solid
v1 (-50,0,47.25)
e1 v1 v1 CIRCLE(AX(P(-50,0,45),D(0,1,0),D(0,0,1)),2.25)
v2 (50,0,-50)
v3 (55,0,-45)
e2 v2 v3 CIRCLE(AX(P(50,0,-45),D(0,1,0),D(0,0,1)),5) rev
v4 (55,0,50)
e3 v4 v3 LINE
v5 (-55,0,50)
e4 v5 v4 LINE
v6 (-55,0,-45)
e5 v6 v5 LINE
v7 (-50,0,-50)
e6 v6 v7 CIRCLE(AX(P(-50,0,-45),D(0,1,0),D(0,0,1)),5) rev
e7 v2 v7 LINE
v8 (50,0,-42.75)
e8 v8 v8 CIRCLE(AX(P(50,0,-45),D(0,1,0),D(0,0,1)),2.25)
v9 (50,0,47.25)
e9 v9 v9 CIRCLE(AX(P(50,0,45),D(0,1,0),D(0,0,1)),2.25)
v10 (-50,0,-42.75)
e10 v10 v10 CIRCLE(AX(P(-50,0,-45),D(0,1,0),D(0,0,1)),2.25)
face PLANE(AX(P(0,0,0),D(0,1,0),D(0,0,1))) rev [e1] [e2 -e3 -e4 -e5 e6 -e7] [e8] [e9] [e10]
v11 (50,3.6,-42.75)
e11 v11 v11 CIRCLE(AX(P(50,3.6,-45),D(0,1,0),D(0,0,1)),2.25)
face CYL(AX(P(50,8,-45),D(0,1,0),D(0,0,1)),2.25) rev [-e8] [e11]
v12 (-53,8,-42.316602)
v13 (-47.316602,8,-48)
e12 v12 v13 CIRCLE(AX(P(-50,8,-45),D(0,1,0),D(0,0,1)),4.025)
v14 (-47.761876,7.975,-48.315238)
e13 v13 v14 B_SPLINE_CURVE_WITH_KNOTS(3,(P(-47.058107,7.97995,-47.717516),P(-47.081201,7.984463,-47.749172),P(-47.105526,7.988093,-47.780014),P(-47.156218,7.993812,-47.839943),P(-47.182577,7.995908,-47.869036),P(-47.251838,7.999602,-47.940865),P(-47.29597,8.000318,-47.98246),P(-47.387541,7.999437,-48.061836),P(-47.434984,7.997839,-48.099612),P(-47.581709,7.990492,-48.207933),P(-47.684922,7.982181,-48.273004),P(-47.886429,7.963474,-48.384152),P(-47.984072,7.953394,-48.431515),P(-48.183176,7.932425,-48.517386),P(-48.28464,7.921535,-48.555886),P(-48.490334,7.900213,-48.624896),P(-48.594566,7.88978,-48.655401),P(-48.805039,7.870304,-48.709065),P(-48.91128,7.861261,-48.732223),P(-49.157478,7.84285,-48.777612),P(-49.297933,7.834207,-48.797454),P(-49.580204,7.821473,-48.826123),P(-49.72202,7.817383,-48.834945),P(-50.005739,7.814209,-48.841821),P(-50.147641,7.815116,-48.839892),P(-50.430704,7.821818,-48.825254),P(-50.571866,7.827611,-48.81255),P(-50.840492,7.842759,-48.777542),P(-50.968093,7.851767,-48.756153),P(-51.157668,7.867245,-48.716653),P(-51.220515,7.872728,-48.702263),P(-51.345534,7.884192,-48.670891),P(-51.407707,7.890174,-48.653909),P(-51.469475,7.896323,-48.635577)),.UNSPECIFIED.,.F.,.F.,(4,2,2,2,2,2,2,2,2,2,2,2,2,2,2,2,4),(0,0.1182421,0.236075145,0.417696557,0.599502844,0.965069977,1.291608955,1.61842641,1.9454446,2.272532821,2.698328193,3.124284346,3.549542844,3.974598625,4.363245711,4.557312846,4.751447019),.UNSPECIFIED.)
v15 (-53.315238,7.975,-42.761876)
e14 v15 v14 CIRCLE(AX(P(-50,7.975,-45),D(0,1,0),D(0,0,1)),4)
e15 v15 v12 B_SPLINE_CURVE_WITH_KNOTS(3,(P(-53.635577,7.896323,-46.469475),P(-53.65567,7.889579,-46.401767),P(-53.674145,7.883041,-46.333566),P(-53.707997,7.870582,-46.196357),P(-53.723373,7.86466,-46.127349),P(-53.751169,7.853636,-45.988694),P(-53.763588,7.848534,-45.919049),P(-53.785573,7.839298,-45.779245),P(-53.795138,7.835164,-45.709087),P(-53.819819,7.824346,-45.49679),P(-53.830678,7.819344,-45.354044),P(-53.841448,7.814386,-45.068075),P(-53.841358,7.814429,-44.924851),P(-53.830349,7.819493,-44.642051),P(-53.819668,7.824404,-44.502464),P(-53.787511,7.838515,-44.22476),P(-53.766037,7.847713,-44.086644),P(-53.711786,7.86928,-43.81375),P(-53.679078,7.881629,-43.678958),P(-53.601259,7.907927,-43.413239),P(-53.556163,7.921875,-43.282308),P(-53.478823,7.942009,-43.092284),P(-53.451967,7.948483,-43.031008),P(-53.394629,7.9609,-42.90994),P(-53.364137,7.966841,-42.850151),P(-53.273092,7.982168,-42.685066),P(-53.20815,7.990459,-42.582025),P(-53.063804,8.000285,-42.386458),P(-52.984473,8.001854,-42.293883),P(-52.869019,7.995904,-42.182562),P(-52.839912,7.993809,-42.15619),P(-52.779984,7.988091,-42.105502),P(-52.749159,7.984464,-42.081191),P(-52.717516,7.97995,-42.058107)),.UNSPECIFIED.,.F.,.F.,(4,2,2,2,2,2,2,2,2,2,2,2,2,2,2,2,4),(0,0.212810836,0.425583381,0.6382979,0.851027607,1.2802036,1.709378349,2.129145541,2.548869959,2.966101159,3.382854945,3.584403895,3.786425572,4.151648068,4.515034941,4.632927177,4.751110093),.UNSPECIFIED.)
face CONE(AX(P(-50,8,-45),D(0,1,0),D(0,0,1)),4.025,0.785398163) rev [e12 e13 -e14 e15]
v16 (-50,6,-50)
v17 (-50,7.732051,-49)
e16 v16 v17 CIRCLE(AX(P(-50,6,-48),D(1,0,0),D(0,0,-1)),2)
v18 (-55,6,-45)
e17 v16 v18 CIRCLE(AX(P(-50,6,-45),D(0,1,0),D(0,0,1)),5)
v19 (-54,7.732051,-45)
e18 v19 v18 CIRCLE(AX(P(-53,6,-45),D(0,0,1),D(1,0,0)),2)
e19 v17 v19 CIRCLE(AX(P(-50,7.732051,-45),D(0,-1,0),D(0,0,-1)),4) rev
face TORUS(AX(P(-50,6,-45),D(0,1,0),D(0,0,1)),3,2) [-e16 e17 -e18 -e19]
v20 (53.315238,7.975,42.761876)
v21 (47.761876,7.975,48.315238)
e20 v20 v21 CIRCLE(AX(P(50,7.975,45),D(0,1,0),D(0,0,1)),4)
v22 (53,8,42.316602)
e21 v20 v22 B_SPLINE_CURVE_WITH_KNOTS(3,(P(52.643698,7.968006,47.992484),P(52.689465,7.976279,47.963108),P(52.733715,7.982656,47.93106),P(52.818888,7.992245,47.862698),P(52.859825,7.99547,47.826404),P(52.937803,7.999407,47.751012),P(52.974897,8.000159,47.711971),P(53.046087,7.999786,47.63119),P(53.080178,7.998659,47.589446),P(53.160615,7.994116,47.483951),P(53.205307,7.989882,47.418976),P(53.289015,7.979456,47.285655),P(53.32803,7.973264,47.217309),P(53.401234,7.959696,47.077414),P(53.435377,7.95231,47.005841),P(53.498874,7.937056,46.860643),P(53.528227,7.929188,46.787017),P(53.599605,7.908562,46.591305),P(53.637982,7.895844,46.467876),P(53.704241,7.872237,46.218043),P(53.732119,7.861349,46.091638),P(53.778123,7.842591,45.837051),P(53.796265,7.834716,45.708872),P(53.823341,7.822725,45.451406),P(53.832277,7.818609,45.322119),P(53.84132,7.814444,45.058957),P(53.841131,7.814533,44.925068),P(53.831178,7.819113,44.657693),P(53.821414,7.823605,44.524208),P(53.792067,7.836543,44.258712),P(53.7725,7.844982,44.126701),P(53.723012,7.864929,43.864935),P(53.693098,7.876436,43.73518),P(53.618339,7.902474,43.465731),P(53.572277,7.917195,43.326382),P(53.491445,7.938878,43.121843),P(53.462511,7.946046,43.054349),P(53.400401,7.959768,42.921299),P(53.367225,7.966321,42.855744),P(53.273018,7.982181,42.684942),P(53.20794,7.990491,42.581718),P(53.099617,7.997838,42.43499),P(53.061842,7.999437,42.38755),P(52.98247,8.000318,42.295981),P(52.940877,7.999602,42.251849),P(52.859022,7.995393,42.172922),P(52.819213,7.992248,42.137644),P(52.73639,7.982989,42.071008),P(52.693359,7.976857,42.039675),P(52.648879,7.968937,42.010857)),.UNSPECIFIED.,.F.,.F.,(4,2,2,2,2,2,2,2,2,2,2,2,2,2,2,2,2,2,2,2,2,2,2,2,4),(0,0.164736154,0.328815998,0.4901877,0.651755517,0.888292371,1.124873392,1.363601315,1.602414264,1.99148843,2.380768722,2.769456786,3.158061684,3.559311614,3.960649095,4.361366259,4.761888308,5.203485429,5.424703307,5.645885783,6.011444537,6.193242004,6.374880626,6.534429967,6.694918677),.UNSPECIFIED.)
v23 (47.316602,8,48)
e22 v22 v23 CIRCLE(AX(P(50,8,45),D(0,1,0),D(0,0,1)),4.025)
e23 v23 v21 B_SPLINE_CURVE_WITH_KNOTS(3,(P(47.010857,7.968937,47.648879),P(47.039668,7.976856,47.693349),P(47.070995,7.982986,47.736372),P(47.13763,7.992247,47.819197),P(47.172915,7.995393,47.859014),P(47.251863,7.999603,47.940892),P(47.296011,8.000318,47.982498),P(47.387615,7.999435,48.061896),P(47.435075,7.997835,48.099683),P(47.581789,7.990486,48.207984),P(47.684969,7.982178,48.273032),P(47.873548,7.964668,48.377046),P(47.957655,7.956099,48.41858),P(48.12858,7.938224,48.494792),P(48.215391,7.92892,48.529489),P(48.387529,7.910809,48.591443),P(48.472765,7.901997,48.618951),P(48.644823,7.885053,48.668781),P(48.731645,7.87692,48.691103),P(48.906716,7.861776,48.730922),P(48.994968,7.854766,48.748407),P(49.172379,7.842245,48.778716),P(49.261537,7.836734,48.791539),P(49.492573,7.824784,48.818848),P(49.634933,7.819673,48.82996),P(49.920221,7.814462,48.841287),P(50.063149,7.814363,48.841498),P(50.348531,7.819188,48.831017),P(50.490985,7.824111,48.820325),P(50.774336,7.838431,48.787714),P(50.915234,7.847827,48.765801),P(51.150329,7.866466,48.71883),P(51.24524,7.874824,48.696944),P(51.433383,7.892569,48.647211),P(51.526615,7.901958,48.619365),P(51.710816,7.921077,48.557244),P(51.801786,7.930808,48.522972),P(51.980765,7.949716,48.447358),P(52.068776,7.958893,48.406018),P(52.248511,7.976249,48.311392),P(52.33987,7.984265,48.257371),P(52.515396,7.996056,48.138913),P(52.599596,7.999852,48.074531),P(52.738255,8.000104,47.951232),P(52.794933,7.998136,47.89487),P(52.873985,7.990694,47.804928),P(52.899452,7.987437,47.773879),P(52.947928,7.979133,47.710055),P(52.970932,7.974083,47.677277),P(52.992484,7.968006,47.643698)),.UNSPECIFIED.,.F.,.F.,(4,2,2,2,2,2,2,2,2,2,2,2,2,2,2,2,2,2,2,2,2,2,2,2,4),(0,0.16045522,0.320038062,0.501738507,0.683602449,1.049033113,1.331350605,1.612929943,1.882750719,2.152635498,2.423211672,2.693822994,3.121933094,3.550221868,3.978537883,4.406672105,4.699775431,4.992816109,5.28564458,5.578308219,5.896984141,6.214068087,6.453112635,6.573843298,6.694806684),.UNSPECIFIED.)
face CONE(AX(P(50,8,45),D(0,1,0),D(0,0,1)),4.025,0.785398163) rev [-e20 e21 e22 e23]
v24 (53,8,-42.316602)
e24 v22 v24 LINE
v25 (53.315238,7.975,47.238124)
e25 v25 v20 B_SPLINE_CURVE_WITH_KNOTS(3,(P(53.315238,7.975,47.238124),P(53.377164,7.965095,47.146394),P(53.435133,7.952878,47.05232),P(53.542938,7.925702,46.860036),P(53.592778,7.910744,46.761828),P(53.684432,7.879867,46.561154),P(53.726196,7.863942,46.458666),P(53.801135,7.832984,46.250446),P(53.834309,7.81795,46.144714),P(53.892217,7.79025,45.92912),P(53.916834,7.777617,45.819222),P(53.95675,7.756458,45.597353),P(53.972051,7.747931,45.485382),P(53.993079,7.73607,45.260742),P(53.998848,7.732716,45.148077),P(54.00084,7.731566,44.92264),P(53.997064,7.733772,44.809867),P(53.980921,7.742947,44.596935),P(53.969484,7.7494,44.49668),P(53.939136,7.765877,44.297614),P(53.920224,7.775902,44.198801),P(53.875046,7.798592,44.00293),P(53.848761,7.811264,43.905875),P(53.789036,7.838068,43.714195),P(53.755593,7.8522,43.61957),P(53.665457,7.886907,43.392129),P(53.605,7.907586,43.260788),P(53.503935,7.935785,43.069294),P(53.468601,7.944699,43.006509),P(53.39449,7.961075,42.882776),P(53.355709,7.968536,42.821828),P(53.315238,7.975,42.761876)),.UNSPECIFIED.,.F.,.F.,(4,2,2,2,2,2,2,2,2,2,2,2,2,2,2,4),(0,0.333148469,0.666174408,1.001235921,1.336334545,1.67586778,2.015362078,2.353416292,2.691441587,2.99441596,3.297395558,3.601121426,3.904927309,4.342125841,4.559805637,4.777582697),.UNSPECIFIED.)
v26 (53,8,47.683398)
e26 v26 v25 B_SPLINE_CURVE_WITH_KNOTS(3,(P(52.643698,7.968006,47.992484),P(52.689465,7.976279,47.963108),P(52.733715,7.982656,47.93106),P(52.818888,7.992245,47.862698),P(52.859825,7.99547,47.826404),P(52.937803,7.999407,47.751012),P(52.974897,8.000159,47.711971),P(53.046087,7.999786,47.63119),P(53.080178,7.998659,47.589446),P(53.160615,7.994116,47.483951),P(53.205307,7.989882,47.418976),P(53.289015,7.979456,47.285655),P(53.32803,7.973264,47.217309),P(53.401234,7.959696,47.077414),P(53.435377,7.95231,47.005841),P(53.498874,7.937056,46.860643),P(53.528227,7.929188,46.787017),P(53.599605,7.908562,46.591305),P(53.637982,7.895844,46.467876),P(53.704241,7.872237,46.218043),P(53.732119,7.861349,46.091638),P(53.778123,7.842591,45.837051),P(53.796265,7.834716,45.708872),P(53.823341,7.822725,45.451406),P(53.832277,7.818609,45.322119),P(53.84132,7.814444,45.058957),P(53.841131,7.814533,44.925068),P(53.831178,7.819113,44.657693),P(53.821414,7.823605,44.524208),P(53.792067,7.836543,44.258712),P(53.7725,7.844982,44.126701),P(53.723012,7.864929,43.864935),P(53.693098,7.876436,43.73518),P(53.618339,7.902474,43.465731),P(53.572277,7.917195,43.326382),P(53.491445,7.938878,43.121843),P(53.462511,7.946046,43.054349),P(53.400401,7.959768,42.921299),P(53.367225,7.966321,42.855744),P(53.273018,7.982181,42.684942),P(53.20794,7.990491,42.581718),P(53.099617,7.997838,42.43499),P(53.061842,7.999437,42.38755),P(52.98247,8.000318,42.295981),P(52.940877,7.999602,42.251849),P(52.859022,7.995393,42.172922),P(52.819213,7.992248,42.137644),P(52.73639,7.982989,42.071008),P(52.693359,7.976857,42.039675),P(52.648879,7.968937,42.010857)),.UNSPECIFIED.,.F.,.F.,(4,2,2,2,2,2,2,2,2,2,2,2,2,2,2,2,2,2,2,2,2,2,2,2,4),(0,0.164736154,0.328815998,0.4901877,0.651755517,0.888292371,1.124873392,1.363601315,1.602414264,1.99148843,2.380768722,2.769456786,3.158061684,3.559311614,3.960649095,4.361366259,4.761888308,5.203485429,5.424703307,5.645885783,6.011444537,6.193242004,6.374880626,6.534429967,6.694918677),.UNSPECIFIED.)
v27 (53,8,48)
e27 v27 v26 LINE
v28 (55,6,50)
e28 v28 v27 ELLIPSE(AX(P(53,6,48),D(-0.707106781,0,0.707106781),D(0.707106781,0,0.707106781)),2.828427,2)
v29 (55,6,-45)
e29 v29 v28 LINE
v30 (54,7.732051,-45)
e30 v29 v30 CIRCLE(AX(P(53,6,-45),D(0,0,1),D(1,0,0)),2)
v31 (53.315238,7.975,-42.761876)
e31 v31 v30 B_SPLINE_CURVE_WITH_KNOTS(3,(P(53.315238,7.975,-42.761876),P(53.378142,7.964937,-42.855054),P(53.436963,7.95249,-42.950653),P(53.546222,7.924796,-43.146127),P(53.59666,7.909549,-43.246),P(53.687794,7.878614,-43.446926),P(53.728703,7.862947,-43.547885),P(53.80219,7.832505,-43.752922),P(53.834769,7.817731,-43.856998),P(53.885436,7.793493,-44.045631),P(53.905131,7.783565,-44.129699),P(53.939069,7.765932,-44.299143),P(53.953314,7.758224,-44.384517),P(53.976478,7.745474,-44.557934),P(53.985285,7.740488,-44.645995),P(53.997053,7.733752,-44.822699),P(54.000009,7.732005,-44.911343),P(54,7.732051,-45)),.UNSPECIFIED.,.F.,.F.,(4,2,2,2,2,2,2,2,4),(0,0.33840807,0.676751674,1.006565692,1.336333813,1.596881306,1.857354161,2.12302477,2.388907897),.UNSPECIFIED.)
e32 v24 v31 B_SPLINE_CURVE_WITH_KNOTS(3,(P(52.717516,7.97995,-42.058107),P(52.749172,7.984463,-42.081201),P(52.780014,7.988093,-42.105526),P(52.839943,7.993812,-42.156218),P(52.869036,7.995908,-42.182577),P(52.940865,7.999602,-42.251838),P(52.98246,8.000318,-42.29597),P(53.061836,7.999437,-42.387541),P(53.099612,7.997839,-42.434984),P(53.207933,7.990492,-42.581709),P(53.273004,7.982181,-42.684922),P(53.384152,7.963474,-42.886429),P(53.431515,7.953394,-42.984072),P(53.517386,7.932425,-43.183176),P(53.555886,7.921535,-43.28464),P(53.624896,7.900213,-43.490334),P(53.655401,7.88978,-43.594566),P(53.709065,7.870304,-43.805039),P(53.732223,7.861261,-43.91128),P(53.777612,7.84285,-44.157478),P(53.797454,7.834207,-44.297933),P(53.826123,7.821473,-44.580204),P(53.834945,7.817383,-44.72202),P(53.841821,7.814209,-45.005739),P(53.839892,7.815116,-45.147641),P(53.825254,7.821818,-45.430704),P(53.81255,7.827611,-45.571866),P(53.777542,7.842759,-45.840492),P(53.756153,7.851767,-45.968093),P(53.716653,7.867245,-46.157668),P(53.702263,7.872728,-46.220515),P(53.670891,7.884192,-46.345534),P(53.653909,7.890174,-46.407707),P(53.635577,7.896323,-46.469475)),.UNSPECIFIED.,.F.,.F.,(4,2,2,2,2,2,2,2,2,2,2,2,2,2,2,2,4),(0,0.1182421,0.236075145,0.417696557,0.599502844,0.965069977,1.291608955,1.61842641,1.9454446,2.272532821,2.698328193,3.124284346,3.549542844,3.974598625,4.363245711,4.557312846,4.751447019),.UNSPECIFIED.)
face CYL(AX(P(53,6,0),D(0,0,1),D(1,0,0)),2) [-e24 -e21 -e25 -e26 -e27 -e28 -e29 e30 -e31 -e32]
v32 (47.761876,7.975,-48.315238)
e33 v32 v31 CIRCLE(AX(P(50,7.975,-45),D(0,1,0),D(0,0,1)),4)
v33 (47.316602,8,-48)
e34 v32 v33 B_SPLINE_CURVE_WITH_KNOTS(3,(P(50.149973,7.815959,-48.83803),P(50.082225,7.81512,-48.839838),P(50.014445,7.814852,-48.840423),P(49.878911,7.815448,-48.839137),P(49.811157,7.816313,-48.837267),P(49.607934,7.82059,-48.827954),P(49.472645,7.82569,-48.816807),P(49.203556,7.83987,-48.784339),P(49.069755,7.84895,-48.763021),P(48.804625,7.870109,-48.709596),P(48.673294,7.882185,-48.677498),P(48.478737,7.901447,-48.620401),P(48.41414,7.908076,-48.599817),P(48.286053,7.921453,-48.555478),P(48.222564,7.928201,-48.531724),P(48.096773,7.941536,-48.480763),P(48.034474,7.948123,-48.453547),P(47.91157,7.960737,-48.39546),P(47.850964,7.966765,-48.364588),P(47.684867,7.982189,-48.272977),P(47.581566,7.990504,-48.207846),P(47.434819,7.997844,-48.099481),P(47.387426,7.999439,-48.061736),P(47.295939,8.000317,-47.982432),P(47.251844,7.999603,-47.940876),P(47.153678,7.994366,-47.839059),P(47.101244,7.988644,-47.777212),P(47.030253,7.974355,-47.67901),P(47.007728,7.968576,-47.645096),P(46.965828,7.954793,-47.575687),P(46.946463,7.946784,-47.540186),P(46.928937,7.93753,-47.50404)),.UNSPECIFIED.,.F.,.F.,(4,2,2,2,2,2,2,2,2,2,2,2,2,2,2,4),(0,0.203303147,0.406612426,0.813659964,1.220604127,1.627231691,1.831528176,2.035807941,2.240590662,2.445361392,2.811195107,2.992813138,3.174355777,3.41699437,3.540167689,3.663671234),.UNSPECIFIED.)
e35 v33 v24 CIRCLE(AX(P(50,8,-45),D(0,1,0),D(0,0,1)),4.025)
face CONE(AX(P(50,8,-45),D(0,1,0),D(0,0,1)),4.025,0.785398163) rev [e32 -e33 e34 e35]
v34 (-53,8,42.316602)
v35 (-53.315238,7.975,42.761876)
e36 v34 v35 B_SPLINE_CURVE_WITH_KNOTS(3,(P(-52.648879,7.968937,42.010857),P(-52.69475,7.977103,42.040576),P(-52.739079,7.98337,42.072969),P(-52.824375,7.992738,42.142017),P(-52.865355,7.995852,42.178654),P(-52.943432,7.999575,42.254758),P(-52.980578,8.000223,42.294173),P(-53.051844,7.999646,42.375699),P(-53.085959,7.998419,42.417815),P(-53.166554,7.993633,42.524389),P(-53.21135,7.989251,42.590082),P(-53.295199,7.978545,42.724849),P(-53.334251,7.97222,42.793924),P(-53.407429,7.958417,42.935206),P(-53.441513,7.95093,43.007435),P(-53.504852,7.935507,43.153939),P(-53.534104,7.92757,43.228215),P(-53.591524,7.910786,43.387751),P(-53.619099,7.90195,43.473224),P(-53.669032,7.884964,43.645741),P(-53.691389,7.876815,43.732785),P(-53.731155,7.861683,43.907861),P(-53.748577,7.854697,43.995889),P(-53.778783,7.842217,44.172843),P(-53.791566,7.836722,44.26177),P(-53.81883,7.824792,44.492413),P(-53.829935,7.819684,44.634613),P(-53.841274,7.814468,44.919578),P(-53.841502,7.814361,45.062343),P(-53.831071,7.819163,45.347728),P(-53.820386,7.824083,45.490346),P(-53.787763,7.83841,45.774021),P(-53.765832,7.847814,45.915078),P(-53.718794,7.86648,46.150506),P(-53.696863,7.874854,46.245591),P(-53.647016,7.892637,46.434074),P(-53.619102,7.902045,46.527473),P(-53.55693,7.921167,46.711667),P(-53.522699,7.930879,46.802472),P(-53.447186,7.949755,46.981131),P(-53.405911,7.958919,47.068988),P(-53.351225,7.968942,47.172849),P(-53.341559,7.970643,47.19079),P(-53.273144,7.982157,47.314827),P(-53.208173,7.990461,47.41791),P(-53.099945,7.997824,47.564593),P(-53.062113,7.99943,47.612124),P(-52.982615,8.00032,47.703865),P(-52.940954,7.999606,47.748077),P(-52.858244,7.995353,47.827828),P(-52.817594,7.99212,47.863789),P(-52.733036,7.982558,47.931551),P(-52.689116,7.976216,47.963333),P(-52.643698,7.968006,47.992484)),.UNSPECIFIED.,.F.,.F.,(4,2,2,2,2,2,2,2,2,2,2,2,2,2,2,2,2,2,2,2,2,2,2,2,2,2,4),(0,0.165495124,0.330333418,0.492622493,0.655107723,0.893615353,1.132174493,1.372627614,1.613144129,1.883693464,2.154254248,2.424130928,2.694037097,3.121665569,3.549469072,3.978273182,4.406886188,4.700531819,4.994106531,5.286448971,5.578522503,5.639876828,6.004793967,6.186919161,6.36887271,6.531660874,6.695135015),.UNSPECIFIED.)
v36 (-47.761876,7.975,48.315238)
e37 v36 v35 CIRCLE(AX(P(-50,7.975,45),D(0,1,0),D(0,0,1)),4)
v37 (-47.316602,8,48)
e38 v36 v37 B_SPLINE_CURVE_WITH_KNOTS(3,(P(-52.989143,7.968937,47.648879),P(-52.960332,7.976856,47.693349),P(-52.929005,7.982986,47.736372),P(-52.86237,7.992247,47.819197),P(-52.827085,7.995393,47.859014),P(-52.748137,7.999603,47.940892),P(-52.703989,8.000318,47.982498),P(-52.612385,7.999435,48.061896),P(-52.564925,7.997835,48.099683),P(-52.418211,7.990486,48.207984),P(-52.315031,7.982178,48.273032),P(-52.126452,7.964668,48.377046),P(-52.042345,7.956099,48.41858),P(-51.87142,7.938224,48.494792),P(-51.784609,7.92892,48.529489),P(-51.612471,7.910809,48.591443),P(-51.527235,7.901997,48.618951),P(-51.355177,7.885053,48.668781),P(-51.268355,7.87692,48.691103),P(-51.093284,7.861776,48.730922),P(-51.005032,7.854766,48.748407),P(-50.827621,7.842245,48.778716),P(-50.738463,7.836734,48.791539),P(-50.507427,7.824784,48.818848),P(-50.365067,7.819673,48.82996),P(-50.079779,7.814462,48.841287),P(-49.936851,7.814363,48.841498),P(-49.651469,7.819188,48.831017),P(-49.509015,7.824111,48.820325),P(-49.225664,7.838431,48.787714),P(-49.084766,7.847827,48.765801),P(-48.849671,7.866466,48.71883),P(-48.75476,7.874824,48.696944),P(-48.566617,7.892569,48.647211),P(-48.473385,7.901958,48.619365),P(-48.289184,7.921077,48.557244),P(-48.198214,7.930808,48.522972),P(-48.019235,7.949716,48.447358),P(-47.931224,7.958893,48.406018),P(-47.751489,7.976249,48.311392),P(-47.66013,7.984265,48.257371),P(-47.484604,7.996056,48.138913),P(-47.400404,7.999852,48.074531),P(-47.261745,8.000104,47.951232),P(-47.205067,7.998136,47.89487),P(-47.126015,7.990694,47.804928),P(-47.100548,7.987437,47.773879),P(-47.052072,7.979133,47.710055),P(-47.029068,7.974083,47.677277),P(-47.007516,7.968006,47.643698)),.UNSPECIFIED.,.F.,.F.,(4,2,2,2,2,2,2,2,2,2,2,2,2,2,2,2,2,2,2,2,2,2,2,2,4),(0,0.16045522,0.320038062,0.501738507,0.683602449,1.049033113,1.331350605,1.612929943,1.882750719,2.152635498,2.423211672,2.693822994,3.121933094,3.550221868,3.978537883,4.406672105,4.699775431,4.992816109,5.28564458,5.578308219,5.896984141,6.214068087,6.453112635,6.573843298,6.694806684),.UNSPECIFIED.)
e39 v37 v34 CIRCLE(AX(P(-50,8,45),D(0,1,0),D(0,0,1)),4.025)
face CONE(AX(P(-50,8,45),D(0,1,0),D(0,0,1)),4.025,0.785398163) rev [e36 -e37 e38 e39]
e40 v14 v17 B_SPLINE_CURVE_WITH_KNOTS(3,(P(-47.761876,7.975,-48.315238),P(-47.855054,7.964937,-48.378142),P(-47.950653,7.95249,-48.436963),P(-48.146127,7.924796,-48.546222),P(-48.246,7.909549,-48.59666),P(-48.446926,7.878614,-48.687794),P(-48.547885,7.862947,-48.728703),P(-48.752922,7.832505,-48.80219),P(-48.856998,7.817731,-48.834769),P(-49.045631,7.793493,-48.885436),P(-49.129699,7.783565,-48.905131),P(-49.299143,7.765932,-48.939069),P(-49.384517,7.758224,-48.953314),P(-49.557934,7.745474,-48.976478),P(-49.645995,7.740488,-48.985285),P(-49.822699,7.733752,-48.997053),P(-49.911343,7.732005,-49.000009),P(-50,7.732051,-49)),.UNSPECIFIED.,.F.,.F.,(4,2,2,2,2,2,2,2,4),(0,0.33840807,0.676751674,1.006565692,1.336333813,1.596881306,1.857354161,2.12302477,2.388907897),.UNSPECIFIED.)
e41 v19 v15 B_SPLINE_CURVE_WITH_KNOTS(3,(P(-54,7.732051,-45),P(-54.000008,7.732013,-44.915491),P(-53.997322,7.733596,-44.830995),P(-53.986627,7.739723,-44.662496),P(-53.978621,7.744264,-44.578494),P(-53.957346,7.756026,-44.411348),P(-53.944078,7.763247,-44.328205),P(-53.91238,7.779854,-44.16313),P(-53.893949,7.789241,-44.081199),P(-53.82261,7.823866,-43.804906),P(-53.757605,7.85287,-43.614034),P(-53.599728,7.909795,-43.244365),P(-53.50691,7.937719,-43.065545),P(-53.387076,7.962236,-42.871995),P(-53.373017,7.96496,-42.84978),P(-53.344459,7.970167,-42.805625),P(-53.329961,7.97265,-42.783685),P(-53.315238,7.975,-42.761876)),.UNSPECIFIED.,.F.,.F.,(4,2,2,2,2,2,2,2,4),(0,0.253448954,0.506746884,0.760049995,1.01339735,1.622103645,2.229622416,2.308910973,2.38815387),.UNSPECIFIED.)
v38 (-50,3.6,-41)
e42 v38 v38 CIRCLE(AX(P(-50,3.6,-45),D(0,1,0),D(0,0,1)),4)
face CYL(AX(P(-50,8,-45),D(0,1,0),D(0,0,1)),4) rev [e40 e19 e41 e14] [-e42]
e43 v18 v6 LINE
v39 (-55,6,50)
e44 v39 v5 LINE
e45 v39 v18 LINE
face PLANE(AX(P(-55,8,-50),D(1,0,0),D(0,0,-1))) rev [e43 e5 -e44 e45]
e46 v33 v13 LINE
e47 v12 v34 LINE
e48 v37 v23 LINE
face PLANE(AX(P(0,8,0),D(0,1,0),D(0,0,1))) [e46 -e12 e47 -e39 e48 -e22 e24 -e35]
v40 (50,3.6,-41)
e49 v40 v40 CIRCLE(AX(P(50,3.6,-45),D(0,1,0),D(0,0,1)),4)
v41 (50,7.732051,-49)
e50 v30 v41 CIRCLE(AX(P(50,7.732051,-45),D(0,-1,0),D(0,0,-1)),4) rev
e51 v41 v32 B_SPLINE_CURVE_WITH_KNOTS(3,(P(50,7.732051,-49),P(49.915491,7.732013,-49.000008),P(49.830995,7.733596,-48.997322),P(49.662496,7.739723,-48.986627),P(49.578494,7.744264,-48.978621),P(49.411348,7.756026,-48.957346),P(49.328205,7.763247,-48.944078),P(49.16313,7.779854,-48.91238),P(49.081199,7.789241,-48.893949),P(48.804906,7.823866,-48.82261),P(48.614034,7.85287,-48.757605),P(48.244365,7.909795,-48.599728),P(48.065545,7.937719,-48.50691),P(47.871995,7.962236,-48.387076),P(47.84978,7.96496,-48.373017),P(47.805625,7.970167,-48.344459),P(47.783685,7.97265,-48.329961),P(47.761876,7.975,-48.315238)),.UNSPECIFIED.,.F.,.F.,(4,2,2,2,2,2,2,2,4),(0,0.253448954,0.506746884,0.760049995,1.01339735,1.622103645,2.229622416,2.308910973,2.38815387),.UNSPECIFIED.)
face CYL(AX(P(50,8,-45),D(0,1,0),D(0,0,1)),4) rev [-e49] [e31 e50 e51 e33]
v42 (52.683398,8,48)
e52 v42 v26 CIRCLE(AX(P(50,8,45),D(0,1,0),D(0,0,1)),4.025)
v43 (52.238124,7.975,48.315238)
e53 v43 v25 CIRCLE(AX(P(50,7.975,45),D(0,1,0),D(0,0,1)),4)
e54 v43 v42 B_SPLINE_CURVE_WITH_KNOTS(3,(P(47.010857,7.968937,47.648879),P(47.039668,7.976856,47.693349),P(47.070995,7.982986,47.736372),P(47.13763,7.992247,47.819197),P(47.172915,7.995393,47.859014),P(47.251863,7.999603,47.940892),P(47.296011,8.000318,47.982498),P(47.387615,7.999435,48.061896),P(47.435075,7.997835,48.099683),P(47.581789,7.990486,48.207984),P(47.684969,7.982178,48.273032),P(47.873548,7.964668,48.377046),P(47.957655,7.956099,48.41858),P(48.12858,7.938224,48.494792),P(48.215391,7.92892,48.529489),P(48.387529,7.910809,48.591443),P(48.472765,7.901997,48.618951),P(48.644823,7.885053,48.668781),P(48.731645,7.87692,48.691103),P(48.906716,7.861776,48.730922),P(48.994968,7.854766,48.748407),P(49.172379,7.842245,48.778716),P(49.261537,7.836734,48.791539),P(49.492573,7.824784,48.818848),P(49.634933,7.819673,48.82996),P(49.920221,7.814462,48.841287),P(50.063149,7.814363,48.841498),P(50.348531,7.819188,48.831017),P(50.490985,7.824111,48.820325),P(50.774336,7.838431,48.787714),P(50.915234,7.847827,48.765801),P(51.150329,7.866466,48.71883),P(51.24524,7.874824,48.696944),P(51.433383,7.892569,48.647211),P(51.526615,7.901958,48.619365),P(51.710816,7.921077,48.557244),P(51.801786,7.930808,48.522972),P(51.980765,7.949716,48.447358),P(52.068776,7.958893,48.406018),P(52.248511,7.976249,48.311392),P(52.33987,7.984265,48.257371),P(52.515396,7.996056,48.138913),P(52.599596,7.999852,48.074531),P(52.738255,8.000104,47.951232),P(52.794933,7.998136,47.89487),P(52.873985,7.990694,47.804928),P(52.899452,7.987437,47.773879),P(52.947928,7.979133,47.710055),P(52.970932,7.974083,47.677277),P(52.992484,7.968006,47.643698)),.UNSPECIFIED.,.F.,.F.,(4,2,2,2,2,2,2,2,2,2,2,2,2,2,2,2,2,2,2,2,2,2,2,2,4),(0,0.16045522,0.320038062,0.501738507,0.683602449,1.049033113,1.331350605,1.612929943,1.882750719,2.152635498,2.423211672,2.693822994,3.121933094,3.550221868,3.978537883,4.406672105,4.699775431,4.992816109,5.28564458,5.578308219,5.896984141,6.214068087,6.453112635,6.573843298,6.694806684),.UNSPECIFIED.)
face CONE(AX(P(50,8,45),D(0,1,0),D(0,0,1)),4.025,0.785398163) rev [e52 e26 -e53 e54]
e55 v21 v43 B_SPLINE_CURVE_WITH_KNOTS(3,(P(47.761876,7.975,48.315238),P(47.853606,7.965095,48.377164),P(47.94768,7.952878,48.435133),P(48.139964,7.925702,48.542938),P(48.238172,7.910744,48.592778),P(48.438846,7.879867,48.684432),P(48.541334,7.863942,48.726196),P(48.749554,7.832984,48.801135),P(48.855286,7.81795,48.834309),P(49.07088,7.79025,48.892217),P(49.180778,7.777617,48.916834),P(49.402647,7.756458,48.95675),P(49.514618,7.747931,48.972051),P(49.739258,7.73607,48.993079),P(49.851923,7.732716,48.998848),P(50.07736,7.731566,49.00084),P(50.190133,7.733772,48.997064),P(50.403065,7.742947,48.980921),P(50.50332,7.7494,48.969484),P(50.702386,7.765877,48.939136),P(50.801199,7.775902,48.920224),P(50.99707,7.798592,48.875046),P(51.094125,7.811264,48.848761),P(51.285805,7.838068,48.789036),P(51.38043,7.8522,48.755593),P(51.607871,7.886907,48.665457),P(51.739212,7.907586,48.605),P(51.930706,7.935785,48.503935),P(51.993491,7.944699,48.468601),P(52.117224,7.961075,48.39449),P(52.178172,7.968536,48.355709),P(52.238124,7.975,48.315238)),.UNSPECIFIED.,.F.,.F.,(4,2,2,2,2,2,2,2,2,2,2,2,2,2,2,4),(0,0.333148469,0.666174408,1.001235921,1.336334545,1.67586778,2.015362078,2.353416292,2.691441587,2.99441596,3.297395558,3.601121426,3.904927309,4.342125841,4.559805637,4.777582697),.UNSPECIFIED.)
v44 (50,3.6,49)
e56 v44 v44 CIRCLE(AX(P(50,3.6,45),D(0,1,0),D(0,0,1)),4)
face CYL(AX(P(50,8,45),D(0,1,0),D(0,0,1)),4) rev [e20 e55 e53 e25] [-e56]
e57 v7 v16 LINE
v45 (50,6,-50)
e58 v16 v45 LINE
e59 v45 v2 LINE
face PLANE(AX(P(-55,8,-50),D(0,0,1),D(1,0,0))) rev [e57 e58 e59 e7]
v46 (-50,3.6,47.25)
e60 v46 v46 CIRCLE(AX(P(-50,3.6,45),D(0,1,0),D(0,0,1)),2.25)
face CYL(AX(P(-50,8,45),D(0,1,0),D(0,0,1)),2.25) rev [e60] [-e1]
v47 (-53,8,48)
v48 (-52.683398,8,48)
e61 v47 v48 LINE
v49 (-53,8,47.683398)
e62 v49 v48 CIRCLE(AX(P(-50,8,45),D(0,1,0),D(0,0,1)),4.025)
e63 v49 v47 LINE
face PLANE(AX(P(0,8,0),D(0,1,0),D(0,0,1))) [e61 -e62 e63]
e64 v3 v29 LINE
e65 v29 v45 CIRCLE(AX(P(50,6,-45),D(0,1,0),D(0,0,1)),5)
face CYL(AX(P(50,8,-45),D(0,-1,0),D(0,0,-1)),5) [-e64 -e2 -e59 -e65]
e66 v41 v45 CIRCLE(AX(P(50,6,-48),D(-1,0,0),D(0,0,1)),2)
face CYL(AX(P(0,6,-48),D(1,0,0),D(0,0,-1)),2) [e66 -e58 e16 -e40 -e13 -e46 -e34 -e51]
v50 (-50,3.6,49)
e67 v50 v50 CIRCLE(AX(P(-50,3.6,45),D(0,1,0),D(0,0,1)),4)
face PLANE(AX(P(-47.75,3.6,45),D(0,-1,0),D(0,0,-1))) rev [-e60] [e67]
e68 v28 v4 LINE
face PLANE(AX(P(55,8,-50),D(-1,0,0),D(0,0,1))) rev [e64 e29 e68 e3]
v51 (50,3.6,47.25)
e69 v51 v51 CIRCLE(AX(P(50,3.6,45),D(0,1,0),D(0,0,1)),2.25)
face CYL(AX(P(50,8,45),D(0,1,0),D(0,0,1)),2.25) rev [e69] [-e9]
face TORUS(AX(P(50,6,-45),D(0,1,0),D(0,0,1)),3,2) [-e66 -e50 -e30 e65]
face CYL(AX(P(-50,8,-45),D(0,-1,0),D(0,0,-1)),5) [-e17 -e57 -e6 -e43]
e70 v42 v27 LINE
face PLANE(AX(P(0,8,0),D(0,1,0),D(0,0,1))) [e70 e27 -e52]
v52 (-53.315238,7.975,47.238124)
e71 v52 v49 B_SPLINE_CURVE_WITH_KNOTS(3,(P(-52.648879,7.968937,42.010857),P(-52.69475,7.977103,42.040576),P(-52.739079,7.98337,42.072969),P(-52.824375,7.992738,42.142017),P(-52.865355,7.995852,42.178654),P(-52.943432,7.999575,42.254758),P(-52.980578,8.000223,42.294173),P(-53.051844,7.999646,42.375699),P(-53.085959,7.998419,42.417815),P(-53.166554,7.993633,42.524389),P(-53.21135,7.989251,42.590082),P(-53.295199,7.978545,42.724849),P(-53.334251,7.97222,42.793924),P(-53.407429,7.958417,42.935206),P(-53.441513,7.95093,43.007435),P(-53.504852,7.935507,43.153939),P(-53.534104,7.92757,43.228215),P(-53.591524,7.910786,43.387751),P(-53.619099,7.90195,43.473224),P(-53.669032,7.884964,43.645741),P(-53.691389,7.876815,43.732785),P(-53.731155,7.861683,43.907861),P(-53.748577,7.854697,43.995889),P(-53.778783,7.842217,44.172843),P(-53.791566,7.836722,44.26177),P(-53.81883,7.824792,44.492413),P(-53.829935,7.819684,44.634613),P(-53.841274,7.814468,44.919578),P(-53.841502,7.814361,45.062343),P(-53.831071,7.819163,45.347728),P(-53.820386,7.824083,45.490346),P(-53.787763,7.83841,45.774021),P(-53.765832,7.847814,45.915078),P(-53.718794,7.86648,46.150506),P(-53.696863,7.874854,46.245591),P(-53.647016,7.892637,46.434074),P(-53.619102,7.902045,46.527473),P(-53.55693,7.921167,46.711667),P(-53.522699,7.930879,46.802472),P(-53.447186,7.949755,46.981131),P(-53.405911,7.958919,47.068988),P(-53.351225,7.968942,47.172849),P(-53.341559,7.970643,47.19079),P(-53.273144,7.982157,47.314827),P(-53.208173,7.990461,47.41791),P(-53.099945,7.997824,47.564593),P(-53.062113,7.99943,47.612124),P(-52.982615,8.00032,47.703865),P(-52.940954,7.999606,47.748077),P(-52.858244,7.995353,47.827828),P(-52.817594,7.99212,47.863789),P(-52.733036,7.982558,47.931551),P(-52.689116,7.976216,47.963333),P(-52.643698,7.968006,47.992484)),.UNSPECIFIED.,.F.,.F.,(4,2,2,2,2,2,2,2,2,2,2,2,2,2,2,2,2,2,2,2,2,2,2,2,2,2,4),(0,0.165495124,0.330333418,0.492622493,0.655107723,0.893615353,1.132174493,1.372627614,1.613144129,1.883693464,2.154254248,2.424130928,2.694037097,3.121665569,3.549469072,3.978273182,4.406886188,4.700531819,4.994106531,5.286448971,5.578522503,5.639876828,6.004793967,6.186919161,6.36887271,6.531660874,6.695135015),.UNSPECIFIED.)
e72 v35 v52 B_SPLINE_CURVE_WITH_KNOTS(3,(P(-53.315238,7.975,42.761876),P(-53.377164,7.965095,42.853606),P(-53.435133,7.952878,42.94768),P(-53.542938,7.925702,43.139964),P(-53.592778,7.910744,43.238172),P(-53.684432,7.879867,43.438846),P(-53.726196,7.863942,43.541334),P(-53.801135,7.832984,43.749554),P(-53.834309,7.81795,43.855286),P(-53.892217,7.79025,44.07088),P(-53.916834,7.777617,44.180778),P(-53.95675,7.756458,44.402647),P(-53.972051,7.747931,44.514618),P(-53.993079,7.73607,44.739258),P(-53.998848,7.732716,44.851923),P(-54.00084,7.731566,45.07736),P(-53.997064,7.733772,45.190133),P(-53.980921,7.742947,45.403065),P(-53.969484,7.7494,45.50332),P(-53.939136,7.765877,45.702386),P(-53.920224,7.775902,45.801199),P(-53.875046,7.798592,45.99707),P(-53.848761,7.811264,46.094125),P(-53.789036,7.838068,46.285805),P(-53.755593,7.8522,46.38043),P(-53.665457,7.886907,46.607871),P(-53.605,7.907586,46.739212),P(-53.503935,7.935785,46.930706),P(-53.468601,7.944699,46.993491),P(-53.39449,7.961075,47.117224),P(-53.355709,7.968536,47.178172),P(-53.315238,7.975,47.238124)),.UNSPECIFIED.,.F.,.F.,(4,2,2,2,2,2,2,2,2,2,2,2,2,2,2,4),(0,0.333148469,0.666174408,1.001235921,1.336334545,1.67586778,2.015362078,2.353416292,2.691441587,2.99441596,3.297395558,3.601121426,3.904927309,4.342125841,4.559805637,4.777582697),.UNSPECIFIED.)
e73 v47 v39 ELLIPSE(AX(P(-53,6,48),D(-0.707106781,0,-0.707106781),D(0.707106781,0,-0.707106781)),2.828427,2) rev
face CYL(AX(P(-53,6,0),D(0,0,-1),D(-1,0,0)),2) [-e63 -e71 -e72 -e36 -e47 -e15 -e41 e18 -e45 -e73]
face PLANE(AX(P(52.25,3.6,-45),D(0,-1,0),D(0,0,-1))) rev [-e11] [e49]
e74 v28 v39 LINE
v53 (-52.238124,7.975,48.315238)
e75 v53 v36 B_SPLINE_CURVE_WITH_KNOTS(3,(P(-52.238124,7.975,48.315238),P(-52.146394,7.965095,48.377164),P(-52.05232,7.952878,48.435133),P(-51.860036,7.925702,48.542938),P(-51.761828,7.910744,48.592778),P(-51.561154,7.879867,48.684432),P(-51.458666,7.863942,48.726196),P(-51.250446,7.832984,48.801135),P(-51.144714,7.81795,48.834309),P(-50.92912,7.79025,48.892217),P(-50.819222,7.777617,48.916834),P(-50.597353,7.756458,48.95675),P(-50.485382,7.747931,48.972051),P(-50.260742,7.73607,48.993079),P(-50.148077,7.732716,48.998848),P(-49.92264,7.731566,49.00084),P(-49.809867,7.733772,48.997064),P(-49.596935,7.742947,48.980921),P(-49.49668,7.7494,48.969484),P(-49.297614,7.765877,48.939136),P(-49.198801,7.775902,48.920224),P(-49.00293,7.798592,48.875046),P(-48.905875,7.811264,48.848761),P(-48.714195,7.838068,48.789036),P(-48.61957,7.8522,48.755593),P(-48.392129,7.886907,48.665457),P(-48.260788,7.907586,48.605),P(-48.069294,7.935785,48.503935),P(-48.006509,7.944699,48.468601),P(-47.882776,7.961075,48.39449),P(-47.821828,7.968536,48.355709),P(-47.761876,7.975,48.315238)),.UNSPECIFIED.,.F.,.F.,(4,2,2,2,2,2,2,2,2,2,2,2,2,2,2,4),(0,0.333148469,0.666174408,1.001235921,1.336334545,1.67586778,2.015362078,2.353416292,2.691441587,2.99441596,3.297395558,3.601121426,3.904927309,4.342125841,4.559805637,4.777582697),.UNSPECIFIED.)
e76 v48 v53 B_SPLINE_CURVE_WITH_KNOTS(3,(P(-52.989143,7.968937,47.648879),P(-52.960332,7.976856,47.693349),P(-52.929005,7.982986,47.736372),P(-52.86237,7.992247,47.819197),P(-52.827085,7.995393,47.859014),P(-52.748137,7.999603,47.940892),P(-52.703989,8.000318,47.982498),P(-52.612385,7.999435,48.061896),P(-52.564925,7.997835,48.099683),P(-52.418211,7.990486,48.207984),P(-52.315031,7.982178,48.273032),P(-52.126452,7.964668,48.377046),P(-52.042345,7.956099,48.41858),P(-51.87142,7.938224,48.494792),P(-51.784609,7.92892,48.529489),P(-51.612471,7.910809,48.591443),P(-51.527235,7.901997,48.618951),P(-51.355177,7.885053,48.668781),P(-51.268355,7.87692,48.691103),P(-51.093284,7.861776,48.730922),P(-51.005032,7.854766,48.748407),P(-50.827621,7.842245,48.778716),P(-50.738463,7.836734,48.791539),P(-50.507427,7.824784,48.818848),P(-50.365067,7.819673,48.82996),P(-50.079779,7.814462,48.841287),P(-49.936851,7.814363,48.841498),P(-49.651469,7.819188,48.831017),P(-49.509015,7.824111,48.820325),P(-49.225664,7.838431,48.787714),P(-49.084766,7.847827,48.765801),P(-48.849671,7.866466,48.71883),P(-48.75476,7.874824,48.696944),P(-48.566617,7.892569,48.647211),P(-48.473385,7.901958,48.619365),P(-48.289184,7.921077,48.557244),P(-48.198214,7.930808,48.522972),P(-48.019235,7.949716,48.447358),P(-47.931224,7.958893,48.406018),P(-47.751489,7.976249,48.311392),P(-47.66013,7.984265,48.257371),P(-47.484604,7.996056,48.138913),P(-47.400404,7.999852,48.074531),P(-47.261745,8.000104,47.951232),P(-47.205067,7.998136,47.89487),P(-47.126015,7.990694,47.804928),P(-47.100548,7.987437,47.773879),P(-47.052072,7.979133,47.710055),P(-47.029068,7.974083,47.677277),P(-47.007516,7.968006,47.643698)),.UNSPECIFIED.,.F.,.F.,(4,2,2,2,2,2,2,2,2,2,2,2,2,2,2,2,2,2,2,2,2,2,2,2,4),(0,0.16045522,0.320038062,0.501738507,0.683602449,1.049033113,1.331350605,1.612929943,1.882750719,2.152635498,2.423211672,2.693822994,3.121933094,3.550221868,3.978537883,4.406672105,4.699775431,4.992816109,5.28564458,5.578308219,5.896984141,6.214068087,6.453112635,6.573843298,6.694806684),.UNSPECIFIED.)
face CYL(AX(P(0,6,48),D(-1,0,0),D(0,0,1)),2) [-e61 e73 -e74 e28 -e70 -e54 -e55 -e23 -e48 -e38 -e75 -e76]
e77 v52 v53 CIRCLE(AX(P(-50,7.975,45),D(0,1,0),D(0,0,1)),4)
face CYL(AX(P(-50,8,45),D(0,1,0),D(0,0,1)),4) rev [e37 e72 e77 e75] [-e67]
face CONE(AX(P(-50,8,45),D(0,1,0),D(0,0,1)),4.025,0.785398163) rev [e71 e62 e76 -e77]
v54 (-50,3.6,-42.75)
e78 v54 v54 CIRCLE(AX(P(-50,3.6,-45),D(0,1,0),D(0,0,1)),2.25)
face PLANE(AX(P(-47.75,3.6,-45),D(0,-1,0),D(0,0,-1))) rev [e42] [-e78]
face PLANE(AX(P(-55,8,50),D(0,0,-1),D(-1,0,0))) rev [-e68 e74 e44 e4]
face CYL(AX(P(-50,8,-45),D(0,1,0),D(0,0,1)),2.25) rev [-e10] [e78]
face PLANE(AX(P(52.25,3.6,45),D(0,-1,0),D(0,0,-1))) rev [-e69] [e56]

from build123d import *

# Parameters (mm, degrees)
SKETCH2_W                                    = 110
SKETCH2_H                                    = 100
BOSS_EXTRUDE1_DEPTH                          = 8
FILLET2_R                                    = 2
FILLET3_R                                    = 5
CBORE_FOR_M4_HEX_SOCKET_HEAD_CAP_SCR_2_COUNT = 2
CBORE_FOR_M4_HEX_SOCKET_HEAD_CAP_SCR_2_PITCH = 100
CBORE_FOR_M4_HEX_SOCKET_HEAD_CAP_SCR_3_COUNT = 2
CBORE_FOR_M4_HEX_SOCKET_HEAD_CAP_SCR_3_PITCH = 134.536240471
CBORE_FOR_M4_HEX_SOCKET_HEAD_CAP_SCR_4_COUNT = 2
CBORE_FOR_M4_HEX_SOCKET_HEAD_CAP_SCR_4_PITCH = 90


with BuildPart() as part:
    # Sketch2 → Boss-Extrude1 (new body)
    with BuildSketch(Plane(origin=(0, 0, 0), x_dir=(1, 0, 0), z_dir=(0, 1, 0))):
        Rectangle(SKETCH2_W, SKETCH2_H)
    extrude(amount=BOSS_EXTRUDE1_DEPTH)

    # Fillet2
    fillet2_edges = [part.edges().sort_by_distance(p)[0] for p in [
        (-55, 8, 0),
        (0, 8, 50),
        (55, 8, 0),
        (0, 8, -50),
    ]]
    fillet(fillet2_edges, radius=FILLET2_R)

    # Fillet3
    # the kernel refuses this fillet: 5 mm, written as the material it takes off along each edge
    with BuildSketch(Plane(origin=(-50, 8, -45), x_dir=(0, 0, -1), z_dir=(1, 0, 0))) as fillet3_piece_1:
        with BuildLine():
            CenterArc((3, -2), 2, 0, 90)
            Line((5, -2), (5, 0))
            Line((5, 0), (3, 0))
        make_face()
    revolve(axis=Axis((-50, 8, -45), (0, 1, 0)), revolution_arc=90, mode=Mode.SUBTRACT)
    with BuildSketch(Plane(origin=(50, 8, -45), x_dir=(1, 0, 0), z_dir=(0, 0, 1))) as fillet3_piece_2:
        with BuildLine():
            CenterArc((3, -2), 2, 0, 90)
            Line((5, -2), (5, 0))
            Line((5, 0), (3, 0))
        make_face()
    revolve(axis=Axis((50, 8, -45), (0, 1, 0)), revolution_arc=90, mode=Mode.SUBTRACT)
    with BuildSketch(Plane(origin=(-55, -12.5, -50), x_dir=(1, 0, 0), z_dir=(0, 1, 0))) as fillet3_piece_3:
        with BuildLine():
            CenterArc((FILLET3_R, -FILLET3_R), FILLET3_R, 90, 90)
            Line((0, -FILLET3_R), (0, 0))
            Line((0, 0), (FILLET3_R, 0))
        make_face()
    extrude(amount=20.5, mode=Mode.SUBTRACT)
    with BuildSketch(Plane(origin=(55, -12.5, -50), x_dir=(-1, 0, 0), z_dir=(0, 1, 0))) as fillet3_piece_4:
        with BuildLine():
            CenterArc((FILLET3_R, FILLET3_R), FILLET3_R, 180, 90)
            Line((0, FILLET3_R), (0, 0))
            Line((0, 0), (FILLET3_R, 0))
        make_face()
    extrude(amount=20.5, mode=Mode.SUBTRACT)

    # Sketch4 → CBORE for M4 Hex Socket Head Cap Screw1 (revolve, cut)
    with BuildSketch(Plane(origin=(50, 8, -45), x_dir=(0, 0, 1), z_dir=(1, 0, 0))):
        Polygon((0, 0), (0, 11.451936393), (2.25, 10.1), (2.25, 4.4), (4, 4.4), (4, 0.025), (4.025, 0), align=None)
    cbore_for_m4_hex_socket_head_cap_screw1 = revolve(axis=Axis((50, 14.35, -45), (0, -1, 0)), mode=Mode.SUBTRACT)

    # CBORE for M4 Hex Socket Head Cap Scr 2: CBORE for M4 Hex Socket Head Cap Screw1 ×2
    with Locations(*[(-i * CBORE_FOR_M4_HEX_SOCKET_HEAD_CAP_SCR_2_PITCH, 0, 0) for i in range(1, CBORE_FOR_M4_HEX_SOCKET_HEAD_CAP_SCR_2_COUNT)]):
        add(cbore_for_m4_hex_socket_head_cap_screw1, mode=Mode.SUBTRACT)

    # CBORE for M4 Hex Socket Head Cap Scr 3: CBORE for M4 Hex Socket Head Cap Screw1 ×2
    with Locations(*[Vector(-0.7432941462471664, 0, 0.6689647316224497) * (i * CBORE_FOR_M4_HEX_SOCKET_HEAD_CAP_SCR_3_PITCH) for i in range(1, CBORE_FOR_M4_HEX_SOCKET_HEAD_CAP_SCR_3_COUNT)]):
        add(cbore_for_m4_hex_socket_head_cap_screw1, mode=Mode.SUBTRACT)

    # CBORE for M4 Hex Socket Head Cap Scr 4: CBORE for M4 Hex Socket Head Cap Screw1 ×2
    with Locations(*[(0, 0, i * CBORE_FOR_M4_HEX_SOCKET_HEAD_CAP_SCR_4_PITCH) for i in range(1, CBORE_FOR_M4_HEX_SOCKET_HEAD_CAP_SCR_4_COUNT)]):
        add(cbore_for_m4_hex_socket_head_cap_screw1, mode=Mode.SUBTRACT)


solid = part.part
